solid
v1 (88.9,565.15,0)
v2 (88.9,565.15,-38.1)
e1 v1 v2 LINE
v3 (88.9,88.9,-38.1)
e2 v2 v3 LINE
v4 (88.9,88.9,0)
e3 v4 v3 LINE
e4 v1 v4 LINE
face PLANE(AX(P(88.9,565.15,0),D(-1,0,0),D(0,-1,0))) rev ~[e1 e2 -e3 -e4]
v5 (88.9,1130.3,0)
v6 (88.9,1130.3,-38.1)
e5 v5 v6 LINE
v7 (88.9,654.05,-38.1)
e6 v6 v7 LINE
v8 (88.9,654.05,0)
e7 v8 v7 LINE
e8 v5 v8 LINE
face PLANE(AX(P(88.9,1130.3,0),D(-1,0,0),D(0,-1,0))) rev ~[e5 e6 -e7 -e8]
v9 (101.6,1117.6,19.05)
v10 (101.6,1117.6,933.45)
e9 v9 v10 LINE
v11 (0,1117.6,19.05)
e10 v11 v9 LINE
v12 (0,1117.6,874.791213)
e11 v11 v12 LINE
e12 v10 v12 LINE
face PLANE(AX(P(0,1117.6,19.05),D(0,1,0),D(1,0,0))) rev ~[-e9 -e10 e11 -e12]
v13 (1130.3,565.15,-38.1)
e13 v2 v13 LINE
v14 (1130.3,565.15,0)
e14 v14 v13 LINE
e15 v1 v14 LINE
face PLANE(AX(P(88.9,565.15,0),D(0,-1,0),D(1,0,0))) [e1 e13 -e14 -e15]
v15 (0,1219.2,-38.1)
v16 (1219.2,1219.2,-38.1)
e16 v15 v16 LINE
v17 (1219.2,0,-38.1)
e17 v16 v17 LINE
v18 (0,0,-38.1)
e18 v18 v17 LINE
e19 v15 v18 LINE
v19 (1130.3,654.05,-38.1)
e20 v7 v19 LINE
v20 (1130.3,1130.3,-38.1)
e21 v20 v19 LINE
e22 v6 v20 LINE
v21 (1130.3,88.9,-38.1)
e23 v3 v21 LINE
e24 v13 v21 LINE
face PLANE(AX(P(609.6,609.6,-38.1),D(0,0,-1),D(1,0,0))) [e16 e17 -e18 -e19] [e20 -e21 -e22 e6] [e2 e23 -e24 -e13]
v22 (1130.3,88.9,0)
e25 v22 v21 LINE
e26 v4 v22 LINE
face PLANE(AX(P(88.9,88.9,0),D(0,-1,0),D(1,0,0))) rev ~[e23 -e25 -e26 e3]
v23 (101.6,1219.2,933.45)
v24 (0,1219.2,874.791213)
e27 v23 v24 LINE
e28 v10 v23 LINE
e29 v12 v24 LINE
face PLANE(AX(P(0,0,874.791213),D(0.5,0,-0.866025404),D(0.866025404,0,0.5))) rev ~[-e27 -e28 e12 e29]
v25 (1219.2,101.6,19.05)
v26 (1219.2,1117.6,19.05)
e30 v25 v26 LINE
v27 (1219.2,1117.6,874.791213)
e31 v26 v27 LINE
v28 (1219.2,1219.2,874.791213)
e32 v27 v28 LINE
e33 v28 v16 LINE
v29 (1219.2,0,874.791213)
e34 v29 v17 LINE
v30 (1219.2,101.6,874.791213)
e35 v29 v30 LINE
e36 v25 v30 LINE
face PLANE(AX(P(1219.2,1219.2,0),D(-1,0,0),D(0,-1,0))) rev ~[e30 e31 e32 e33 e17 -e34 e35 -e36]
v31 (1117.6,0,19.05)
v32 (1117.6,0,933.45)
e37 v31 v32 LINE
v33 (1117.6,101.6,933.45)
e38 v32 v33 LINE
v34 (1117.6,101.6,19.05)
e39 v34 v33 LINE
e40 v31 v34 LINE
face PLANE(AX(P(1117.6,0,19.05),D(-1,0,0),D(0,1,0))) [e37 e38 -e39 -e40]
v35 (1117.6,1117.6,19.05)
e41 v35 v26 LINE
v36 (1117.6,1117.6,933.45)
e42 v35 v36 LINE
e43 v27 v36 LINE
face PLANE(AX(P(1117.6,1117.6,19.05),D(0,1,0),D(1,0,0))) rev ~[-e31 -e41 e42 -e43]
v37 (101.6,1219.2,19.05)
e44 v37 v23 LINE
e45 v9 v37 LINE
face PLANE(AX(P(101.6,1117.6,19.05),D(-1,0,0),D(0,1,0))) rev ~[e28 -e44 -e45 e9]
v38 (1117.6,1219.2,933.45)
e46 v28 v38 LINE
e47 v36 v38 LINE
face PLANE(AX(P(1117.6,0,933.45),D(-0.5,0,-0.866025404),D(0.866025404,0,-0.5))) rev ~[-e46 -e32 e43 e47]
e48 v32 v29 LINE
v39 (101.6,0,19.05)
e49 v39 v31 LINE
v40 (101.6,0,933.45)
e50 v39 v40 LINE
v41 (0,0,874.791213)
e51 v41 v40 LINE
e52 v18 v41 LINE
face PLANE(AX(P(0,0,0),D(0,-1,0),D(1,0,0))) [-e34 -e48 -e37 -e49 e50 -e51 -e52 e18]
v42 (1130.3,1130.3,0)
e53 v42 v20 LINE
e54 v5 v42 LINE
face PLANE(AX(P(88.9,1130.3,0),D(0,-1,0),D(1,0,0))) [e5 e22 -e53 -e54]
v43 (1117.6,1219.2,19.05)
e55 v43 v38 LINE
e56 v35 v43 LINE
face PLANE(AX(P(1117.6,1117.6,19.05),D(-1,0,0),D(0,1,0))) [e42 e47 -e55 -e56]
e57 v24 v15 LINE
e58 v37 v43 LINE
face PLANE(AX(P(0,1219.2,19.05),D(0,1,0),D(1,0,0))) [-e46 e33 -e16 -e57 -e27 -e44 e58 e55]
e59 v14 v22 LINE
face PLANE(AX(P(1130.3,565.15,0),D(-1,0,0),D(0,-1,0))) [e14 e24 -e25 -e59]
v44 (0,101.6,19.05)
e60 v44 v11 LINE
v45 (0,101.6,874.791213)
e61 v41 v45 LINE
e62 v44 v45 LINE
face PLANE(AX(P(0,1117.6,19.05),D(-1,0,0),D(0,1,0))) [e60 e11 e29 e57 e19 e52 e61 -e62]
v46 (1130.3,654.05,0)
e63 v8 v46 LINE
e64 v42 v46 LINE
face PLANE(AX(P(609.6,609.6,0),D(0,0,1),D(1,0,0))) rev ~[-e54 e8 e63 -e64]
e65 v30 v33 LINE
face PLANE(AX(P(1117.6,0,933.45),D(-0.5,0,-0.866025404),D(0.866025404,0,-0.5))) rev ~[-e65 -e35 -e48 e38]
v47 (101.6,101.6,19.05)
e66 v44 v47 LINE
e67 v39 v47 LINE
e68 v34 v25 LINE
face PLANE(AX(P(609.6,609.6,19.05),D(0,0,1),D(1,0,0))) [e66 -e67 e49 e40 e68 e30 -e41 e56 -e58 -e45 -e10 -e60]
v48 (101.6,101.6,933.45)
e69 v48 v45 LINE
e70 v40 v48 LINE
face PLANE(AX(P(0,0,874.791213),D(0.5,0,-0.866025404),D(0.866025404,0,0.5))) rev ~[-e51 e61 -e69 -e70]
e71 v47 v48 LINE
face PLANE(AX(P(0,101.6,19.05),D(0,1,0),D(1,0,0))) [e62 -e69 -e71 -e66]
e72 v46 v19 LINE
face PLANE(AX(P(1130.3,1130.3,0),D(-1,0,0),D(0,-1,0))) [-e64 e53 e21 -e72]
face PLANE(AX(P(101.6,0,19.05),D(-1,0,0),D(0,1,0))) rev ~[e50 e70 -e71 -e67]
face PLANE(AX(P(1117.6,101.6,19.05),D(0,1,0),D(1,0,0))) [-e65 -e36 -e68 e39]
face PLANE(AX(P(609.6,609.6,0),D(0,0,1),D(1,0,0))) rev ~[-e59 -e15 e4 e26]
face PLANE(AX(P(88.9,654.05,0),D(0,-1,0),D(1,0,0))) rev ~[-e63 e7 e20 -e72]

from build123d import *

# Parameters (mm, degrees)
F0_W          = 1219.2
F0_H          = 1219.2
F1_DEPTH      = 19.05
F2_W          = 1219.2
F2_H          = 1219.2
F2_W_2        = 1041.4
F2_H_2        = 476.25
F3_DEPTH      = 38.1
F4_W          = 101.6
F4_H          = 101.6
F5_DEPTH      = 914.4
F7_DEPTH      = 2867
F7_DEPTH_BACK = 1219.201


# Not quite as in the source:
# - an extrude ends at something that could not be found from the text; its depth is read off the source's solid


with BuildPart() as f1:
    # F0 (on Top) → F1 (new body)
    with BuildSketch(Plane.XY):
        with Locations((609.6, 609.6)):
            Rectangle(F0_W, F0_H)
    extrude(amount=F1_DEPTH)

    # F2 (on face) → F3 (join)
    with BuildSketch(Plane(origin=(0, 0, 0), x_dir=(1, 0, 0), z_dir=(0, 0, -1))):
        with Locations((609.6, -609.6)):
            Rectangle(F2_W, F2_H)
        with Locations((609.6, -892.175)):
            Rectangle(F2_W_2, F2_H_2, mode=Mode.SUBTRACT)
        with Locations((609.6, -327.025)):
            Rectangle(F2_W_2, F2_H_2, mode=Mode.SUBTRACT)
    extrude(amount=F3_DEPTH)

    # F4 (on face) → F5 (join)
    with BuildSketch(Plane.XY.offset(19.05)):
        with Locations((50.8, 1168.4)):
            Rectangle(F4_W, F4_H)
        with Locations((50.8, 50.8)):
            Rectangle(F4_W, F4_H)
        with Locations((1168.4, 50.8)):
            Rectangle(F4_W, F4_H)
        with Locations((1168.4, 1168.4)):
            Rectangle(F4_W, F4_H)
    extrude(amount=F5_DEPTH)

    # F6 (on face) → F7 (cut, two sides)
    with BuildSketch(Plane.XZ) as f7_sk:
        Polygon((0, 874.7912126503), (101.6, 933.45), (0, 933.45), align=None)
        Polygon((1219.2, 933.45), (1117.6, 933.45), (1219.2, 874.7912126503), align=None)
    extrude(amount=F7_DEPTH, mode=Mode.SUBTRACT)
    extrude(f7_sk.sketch, amount=-F7_DEPTH_BACK, mode=Mode.SUBTRACT)


solid = f1.part
